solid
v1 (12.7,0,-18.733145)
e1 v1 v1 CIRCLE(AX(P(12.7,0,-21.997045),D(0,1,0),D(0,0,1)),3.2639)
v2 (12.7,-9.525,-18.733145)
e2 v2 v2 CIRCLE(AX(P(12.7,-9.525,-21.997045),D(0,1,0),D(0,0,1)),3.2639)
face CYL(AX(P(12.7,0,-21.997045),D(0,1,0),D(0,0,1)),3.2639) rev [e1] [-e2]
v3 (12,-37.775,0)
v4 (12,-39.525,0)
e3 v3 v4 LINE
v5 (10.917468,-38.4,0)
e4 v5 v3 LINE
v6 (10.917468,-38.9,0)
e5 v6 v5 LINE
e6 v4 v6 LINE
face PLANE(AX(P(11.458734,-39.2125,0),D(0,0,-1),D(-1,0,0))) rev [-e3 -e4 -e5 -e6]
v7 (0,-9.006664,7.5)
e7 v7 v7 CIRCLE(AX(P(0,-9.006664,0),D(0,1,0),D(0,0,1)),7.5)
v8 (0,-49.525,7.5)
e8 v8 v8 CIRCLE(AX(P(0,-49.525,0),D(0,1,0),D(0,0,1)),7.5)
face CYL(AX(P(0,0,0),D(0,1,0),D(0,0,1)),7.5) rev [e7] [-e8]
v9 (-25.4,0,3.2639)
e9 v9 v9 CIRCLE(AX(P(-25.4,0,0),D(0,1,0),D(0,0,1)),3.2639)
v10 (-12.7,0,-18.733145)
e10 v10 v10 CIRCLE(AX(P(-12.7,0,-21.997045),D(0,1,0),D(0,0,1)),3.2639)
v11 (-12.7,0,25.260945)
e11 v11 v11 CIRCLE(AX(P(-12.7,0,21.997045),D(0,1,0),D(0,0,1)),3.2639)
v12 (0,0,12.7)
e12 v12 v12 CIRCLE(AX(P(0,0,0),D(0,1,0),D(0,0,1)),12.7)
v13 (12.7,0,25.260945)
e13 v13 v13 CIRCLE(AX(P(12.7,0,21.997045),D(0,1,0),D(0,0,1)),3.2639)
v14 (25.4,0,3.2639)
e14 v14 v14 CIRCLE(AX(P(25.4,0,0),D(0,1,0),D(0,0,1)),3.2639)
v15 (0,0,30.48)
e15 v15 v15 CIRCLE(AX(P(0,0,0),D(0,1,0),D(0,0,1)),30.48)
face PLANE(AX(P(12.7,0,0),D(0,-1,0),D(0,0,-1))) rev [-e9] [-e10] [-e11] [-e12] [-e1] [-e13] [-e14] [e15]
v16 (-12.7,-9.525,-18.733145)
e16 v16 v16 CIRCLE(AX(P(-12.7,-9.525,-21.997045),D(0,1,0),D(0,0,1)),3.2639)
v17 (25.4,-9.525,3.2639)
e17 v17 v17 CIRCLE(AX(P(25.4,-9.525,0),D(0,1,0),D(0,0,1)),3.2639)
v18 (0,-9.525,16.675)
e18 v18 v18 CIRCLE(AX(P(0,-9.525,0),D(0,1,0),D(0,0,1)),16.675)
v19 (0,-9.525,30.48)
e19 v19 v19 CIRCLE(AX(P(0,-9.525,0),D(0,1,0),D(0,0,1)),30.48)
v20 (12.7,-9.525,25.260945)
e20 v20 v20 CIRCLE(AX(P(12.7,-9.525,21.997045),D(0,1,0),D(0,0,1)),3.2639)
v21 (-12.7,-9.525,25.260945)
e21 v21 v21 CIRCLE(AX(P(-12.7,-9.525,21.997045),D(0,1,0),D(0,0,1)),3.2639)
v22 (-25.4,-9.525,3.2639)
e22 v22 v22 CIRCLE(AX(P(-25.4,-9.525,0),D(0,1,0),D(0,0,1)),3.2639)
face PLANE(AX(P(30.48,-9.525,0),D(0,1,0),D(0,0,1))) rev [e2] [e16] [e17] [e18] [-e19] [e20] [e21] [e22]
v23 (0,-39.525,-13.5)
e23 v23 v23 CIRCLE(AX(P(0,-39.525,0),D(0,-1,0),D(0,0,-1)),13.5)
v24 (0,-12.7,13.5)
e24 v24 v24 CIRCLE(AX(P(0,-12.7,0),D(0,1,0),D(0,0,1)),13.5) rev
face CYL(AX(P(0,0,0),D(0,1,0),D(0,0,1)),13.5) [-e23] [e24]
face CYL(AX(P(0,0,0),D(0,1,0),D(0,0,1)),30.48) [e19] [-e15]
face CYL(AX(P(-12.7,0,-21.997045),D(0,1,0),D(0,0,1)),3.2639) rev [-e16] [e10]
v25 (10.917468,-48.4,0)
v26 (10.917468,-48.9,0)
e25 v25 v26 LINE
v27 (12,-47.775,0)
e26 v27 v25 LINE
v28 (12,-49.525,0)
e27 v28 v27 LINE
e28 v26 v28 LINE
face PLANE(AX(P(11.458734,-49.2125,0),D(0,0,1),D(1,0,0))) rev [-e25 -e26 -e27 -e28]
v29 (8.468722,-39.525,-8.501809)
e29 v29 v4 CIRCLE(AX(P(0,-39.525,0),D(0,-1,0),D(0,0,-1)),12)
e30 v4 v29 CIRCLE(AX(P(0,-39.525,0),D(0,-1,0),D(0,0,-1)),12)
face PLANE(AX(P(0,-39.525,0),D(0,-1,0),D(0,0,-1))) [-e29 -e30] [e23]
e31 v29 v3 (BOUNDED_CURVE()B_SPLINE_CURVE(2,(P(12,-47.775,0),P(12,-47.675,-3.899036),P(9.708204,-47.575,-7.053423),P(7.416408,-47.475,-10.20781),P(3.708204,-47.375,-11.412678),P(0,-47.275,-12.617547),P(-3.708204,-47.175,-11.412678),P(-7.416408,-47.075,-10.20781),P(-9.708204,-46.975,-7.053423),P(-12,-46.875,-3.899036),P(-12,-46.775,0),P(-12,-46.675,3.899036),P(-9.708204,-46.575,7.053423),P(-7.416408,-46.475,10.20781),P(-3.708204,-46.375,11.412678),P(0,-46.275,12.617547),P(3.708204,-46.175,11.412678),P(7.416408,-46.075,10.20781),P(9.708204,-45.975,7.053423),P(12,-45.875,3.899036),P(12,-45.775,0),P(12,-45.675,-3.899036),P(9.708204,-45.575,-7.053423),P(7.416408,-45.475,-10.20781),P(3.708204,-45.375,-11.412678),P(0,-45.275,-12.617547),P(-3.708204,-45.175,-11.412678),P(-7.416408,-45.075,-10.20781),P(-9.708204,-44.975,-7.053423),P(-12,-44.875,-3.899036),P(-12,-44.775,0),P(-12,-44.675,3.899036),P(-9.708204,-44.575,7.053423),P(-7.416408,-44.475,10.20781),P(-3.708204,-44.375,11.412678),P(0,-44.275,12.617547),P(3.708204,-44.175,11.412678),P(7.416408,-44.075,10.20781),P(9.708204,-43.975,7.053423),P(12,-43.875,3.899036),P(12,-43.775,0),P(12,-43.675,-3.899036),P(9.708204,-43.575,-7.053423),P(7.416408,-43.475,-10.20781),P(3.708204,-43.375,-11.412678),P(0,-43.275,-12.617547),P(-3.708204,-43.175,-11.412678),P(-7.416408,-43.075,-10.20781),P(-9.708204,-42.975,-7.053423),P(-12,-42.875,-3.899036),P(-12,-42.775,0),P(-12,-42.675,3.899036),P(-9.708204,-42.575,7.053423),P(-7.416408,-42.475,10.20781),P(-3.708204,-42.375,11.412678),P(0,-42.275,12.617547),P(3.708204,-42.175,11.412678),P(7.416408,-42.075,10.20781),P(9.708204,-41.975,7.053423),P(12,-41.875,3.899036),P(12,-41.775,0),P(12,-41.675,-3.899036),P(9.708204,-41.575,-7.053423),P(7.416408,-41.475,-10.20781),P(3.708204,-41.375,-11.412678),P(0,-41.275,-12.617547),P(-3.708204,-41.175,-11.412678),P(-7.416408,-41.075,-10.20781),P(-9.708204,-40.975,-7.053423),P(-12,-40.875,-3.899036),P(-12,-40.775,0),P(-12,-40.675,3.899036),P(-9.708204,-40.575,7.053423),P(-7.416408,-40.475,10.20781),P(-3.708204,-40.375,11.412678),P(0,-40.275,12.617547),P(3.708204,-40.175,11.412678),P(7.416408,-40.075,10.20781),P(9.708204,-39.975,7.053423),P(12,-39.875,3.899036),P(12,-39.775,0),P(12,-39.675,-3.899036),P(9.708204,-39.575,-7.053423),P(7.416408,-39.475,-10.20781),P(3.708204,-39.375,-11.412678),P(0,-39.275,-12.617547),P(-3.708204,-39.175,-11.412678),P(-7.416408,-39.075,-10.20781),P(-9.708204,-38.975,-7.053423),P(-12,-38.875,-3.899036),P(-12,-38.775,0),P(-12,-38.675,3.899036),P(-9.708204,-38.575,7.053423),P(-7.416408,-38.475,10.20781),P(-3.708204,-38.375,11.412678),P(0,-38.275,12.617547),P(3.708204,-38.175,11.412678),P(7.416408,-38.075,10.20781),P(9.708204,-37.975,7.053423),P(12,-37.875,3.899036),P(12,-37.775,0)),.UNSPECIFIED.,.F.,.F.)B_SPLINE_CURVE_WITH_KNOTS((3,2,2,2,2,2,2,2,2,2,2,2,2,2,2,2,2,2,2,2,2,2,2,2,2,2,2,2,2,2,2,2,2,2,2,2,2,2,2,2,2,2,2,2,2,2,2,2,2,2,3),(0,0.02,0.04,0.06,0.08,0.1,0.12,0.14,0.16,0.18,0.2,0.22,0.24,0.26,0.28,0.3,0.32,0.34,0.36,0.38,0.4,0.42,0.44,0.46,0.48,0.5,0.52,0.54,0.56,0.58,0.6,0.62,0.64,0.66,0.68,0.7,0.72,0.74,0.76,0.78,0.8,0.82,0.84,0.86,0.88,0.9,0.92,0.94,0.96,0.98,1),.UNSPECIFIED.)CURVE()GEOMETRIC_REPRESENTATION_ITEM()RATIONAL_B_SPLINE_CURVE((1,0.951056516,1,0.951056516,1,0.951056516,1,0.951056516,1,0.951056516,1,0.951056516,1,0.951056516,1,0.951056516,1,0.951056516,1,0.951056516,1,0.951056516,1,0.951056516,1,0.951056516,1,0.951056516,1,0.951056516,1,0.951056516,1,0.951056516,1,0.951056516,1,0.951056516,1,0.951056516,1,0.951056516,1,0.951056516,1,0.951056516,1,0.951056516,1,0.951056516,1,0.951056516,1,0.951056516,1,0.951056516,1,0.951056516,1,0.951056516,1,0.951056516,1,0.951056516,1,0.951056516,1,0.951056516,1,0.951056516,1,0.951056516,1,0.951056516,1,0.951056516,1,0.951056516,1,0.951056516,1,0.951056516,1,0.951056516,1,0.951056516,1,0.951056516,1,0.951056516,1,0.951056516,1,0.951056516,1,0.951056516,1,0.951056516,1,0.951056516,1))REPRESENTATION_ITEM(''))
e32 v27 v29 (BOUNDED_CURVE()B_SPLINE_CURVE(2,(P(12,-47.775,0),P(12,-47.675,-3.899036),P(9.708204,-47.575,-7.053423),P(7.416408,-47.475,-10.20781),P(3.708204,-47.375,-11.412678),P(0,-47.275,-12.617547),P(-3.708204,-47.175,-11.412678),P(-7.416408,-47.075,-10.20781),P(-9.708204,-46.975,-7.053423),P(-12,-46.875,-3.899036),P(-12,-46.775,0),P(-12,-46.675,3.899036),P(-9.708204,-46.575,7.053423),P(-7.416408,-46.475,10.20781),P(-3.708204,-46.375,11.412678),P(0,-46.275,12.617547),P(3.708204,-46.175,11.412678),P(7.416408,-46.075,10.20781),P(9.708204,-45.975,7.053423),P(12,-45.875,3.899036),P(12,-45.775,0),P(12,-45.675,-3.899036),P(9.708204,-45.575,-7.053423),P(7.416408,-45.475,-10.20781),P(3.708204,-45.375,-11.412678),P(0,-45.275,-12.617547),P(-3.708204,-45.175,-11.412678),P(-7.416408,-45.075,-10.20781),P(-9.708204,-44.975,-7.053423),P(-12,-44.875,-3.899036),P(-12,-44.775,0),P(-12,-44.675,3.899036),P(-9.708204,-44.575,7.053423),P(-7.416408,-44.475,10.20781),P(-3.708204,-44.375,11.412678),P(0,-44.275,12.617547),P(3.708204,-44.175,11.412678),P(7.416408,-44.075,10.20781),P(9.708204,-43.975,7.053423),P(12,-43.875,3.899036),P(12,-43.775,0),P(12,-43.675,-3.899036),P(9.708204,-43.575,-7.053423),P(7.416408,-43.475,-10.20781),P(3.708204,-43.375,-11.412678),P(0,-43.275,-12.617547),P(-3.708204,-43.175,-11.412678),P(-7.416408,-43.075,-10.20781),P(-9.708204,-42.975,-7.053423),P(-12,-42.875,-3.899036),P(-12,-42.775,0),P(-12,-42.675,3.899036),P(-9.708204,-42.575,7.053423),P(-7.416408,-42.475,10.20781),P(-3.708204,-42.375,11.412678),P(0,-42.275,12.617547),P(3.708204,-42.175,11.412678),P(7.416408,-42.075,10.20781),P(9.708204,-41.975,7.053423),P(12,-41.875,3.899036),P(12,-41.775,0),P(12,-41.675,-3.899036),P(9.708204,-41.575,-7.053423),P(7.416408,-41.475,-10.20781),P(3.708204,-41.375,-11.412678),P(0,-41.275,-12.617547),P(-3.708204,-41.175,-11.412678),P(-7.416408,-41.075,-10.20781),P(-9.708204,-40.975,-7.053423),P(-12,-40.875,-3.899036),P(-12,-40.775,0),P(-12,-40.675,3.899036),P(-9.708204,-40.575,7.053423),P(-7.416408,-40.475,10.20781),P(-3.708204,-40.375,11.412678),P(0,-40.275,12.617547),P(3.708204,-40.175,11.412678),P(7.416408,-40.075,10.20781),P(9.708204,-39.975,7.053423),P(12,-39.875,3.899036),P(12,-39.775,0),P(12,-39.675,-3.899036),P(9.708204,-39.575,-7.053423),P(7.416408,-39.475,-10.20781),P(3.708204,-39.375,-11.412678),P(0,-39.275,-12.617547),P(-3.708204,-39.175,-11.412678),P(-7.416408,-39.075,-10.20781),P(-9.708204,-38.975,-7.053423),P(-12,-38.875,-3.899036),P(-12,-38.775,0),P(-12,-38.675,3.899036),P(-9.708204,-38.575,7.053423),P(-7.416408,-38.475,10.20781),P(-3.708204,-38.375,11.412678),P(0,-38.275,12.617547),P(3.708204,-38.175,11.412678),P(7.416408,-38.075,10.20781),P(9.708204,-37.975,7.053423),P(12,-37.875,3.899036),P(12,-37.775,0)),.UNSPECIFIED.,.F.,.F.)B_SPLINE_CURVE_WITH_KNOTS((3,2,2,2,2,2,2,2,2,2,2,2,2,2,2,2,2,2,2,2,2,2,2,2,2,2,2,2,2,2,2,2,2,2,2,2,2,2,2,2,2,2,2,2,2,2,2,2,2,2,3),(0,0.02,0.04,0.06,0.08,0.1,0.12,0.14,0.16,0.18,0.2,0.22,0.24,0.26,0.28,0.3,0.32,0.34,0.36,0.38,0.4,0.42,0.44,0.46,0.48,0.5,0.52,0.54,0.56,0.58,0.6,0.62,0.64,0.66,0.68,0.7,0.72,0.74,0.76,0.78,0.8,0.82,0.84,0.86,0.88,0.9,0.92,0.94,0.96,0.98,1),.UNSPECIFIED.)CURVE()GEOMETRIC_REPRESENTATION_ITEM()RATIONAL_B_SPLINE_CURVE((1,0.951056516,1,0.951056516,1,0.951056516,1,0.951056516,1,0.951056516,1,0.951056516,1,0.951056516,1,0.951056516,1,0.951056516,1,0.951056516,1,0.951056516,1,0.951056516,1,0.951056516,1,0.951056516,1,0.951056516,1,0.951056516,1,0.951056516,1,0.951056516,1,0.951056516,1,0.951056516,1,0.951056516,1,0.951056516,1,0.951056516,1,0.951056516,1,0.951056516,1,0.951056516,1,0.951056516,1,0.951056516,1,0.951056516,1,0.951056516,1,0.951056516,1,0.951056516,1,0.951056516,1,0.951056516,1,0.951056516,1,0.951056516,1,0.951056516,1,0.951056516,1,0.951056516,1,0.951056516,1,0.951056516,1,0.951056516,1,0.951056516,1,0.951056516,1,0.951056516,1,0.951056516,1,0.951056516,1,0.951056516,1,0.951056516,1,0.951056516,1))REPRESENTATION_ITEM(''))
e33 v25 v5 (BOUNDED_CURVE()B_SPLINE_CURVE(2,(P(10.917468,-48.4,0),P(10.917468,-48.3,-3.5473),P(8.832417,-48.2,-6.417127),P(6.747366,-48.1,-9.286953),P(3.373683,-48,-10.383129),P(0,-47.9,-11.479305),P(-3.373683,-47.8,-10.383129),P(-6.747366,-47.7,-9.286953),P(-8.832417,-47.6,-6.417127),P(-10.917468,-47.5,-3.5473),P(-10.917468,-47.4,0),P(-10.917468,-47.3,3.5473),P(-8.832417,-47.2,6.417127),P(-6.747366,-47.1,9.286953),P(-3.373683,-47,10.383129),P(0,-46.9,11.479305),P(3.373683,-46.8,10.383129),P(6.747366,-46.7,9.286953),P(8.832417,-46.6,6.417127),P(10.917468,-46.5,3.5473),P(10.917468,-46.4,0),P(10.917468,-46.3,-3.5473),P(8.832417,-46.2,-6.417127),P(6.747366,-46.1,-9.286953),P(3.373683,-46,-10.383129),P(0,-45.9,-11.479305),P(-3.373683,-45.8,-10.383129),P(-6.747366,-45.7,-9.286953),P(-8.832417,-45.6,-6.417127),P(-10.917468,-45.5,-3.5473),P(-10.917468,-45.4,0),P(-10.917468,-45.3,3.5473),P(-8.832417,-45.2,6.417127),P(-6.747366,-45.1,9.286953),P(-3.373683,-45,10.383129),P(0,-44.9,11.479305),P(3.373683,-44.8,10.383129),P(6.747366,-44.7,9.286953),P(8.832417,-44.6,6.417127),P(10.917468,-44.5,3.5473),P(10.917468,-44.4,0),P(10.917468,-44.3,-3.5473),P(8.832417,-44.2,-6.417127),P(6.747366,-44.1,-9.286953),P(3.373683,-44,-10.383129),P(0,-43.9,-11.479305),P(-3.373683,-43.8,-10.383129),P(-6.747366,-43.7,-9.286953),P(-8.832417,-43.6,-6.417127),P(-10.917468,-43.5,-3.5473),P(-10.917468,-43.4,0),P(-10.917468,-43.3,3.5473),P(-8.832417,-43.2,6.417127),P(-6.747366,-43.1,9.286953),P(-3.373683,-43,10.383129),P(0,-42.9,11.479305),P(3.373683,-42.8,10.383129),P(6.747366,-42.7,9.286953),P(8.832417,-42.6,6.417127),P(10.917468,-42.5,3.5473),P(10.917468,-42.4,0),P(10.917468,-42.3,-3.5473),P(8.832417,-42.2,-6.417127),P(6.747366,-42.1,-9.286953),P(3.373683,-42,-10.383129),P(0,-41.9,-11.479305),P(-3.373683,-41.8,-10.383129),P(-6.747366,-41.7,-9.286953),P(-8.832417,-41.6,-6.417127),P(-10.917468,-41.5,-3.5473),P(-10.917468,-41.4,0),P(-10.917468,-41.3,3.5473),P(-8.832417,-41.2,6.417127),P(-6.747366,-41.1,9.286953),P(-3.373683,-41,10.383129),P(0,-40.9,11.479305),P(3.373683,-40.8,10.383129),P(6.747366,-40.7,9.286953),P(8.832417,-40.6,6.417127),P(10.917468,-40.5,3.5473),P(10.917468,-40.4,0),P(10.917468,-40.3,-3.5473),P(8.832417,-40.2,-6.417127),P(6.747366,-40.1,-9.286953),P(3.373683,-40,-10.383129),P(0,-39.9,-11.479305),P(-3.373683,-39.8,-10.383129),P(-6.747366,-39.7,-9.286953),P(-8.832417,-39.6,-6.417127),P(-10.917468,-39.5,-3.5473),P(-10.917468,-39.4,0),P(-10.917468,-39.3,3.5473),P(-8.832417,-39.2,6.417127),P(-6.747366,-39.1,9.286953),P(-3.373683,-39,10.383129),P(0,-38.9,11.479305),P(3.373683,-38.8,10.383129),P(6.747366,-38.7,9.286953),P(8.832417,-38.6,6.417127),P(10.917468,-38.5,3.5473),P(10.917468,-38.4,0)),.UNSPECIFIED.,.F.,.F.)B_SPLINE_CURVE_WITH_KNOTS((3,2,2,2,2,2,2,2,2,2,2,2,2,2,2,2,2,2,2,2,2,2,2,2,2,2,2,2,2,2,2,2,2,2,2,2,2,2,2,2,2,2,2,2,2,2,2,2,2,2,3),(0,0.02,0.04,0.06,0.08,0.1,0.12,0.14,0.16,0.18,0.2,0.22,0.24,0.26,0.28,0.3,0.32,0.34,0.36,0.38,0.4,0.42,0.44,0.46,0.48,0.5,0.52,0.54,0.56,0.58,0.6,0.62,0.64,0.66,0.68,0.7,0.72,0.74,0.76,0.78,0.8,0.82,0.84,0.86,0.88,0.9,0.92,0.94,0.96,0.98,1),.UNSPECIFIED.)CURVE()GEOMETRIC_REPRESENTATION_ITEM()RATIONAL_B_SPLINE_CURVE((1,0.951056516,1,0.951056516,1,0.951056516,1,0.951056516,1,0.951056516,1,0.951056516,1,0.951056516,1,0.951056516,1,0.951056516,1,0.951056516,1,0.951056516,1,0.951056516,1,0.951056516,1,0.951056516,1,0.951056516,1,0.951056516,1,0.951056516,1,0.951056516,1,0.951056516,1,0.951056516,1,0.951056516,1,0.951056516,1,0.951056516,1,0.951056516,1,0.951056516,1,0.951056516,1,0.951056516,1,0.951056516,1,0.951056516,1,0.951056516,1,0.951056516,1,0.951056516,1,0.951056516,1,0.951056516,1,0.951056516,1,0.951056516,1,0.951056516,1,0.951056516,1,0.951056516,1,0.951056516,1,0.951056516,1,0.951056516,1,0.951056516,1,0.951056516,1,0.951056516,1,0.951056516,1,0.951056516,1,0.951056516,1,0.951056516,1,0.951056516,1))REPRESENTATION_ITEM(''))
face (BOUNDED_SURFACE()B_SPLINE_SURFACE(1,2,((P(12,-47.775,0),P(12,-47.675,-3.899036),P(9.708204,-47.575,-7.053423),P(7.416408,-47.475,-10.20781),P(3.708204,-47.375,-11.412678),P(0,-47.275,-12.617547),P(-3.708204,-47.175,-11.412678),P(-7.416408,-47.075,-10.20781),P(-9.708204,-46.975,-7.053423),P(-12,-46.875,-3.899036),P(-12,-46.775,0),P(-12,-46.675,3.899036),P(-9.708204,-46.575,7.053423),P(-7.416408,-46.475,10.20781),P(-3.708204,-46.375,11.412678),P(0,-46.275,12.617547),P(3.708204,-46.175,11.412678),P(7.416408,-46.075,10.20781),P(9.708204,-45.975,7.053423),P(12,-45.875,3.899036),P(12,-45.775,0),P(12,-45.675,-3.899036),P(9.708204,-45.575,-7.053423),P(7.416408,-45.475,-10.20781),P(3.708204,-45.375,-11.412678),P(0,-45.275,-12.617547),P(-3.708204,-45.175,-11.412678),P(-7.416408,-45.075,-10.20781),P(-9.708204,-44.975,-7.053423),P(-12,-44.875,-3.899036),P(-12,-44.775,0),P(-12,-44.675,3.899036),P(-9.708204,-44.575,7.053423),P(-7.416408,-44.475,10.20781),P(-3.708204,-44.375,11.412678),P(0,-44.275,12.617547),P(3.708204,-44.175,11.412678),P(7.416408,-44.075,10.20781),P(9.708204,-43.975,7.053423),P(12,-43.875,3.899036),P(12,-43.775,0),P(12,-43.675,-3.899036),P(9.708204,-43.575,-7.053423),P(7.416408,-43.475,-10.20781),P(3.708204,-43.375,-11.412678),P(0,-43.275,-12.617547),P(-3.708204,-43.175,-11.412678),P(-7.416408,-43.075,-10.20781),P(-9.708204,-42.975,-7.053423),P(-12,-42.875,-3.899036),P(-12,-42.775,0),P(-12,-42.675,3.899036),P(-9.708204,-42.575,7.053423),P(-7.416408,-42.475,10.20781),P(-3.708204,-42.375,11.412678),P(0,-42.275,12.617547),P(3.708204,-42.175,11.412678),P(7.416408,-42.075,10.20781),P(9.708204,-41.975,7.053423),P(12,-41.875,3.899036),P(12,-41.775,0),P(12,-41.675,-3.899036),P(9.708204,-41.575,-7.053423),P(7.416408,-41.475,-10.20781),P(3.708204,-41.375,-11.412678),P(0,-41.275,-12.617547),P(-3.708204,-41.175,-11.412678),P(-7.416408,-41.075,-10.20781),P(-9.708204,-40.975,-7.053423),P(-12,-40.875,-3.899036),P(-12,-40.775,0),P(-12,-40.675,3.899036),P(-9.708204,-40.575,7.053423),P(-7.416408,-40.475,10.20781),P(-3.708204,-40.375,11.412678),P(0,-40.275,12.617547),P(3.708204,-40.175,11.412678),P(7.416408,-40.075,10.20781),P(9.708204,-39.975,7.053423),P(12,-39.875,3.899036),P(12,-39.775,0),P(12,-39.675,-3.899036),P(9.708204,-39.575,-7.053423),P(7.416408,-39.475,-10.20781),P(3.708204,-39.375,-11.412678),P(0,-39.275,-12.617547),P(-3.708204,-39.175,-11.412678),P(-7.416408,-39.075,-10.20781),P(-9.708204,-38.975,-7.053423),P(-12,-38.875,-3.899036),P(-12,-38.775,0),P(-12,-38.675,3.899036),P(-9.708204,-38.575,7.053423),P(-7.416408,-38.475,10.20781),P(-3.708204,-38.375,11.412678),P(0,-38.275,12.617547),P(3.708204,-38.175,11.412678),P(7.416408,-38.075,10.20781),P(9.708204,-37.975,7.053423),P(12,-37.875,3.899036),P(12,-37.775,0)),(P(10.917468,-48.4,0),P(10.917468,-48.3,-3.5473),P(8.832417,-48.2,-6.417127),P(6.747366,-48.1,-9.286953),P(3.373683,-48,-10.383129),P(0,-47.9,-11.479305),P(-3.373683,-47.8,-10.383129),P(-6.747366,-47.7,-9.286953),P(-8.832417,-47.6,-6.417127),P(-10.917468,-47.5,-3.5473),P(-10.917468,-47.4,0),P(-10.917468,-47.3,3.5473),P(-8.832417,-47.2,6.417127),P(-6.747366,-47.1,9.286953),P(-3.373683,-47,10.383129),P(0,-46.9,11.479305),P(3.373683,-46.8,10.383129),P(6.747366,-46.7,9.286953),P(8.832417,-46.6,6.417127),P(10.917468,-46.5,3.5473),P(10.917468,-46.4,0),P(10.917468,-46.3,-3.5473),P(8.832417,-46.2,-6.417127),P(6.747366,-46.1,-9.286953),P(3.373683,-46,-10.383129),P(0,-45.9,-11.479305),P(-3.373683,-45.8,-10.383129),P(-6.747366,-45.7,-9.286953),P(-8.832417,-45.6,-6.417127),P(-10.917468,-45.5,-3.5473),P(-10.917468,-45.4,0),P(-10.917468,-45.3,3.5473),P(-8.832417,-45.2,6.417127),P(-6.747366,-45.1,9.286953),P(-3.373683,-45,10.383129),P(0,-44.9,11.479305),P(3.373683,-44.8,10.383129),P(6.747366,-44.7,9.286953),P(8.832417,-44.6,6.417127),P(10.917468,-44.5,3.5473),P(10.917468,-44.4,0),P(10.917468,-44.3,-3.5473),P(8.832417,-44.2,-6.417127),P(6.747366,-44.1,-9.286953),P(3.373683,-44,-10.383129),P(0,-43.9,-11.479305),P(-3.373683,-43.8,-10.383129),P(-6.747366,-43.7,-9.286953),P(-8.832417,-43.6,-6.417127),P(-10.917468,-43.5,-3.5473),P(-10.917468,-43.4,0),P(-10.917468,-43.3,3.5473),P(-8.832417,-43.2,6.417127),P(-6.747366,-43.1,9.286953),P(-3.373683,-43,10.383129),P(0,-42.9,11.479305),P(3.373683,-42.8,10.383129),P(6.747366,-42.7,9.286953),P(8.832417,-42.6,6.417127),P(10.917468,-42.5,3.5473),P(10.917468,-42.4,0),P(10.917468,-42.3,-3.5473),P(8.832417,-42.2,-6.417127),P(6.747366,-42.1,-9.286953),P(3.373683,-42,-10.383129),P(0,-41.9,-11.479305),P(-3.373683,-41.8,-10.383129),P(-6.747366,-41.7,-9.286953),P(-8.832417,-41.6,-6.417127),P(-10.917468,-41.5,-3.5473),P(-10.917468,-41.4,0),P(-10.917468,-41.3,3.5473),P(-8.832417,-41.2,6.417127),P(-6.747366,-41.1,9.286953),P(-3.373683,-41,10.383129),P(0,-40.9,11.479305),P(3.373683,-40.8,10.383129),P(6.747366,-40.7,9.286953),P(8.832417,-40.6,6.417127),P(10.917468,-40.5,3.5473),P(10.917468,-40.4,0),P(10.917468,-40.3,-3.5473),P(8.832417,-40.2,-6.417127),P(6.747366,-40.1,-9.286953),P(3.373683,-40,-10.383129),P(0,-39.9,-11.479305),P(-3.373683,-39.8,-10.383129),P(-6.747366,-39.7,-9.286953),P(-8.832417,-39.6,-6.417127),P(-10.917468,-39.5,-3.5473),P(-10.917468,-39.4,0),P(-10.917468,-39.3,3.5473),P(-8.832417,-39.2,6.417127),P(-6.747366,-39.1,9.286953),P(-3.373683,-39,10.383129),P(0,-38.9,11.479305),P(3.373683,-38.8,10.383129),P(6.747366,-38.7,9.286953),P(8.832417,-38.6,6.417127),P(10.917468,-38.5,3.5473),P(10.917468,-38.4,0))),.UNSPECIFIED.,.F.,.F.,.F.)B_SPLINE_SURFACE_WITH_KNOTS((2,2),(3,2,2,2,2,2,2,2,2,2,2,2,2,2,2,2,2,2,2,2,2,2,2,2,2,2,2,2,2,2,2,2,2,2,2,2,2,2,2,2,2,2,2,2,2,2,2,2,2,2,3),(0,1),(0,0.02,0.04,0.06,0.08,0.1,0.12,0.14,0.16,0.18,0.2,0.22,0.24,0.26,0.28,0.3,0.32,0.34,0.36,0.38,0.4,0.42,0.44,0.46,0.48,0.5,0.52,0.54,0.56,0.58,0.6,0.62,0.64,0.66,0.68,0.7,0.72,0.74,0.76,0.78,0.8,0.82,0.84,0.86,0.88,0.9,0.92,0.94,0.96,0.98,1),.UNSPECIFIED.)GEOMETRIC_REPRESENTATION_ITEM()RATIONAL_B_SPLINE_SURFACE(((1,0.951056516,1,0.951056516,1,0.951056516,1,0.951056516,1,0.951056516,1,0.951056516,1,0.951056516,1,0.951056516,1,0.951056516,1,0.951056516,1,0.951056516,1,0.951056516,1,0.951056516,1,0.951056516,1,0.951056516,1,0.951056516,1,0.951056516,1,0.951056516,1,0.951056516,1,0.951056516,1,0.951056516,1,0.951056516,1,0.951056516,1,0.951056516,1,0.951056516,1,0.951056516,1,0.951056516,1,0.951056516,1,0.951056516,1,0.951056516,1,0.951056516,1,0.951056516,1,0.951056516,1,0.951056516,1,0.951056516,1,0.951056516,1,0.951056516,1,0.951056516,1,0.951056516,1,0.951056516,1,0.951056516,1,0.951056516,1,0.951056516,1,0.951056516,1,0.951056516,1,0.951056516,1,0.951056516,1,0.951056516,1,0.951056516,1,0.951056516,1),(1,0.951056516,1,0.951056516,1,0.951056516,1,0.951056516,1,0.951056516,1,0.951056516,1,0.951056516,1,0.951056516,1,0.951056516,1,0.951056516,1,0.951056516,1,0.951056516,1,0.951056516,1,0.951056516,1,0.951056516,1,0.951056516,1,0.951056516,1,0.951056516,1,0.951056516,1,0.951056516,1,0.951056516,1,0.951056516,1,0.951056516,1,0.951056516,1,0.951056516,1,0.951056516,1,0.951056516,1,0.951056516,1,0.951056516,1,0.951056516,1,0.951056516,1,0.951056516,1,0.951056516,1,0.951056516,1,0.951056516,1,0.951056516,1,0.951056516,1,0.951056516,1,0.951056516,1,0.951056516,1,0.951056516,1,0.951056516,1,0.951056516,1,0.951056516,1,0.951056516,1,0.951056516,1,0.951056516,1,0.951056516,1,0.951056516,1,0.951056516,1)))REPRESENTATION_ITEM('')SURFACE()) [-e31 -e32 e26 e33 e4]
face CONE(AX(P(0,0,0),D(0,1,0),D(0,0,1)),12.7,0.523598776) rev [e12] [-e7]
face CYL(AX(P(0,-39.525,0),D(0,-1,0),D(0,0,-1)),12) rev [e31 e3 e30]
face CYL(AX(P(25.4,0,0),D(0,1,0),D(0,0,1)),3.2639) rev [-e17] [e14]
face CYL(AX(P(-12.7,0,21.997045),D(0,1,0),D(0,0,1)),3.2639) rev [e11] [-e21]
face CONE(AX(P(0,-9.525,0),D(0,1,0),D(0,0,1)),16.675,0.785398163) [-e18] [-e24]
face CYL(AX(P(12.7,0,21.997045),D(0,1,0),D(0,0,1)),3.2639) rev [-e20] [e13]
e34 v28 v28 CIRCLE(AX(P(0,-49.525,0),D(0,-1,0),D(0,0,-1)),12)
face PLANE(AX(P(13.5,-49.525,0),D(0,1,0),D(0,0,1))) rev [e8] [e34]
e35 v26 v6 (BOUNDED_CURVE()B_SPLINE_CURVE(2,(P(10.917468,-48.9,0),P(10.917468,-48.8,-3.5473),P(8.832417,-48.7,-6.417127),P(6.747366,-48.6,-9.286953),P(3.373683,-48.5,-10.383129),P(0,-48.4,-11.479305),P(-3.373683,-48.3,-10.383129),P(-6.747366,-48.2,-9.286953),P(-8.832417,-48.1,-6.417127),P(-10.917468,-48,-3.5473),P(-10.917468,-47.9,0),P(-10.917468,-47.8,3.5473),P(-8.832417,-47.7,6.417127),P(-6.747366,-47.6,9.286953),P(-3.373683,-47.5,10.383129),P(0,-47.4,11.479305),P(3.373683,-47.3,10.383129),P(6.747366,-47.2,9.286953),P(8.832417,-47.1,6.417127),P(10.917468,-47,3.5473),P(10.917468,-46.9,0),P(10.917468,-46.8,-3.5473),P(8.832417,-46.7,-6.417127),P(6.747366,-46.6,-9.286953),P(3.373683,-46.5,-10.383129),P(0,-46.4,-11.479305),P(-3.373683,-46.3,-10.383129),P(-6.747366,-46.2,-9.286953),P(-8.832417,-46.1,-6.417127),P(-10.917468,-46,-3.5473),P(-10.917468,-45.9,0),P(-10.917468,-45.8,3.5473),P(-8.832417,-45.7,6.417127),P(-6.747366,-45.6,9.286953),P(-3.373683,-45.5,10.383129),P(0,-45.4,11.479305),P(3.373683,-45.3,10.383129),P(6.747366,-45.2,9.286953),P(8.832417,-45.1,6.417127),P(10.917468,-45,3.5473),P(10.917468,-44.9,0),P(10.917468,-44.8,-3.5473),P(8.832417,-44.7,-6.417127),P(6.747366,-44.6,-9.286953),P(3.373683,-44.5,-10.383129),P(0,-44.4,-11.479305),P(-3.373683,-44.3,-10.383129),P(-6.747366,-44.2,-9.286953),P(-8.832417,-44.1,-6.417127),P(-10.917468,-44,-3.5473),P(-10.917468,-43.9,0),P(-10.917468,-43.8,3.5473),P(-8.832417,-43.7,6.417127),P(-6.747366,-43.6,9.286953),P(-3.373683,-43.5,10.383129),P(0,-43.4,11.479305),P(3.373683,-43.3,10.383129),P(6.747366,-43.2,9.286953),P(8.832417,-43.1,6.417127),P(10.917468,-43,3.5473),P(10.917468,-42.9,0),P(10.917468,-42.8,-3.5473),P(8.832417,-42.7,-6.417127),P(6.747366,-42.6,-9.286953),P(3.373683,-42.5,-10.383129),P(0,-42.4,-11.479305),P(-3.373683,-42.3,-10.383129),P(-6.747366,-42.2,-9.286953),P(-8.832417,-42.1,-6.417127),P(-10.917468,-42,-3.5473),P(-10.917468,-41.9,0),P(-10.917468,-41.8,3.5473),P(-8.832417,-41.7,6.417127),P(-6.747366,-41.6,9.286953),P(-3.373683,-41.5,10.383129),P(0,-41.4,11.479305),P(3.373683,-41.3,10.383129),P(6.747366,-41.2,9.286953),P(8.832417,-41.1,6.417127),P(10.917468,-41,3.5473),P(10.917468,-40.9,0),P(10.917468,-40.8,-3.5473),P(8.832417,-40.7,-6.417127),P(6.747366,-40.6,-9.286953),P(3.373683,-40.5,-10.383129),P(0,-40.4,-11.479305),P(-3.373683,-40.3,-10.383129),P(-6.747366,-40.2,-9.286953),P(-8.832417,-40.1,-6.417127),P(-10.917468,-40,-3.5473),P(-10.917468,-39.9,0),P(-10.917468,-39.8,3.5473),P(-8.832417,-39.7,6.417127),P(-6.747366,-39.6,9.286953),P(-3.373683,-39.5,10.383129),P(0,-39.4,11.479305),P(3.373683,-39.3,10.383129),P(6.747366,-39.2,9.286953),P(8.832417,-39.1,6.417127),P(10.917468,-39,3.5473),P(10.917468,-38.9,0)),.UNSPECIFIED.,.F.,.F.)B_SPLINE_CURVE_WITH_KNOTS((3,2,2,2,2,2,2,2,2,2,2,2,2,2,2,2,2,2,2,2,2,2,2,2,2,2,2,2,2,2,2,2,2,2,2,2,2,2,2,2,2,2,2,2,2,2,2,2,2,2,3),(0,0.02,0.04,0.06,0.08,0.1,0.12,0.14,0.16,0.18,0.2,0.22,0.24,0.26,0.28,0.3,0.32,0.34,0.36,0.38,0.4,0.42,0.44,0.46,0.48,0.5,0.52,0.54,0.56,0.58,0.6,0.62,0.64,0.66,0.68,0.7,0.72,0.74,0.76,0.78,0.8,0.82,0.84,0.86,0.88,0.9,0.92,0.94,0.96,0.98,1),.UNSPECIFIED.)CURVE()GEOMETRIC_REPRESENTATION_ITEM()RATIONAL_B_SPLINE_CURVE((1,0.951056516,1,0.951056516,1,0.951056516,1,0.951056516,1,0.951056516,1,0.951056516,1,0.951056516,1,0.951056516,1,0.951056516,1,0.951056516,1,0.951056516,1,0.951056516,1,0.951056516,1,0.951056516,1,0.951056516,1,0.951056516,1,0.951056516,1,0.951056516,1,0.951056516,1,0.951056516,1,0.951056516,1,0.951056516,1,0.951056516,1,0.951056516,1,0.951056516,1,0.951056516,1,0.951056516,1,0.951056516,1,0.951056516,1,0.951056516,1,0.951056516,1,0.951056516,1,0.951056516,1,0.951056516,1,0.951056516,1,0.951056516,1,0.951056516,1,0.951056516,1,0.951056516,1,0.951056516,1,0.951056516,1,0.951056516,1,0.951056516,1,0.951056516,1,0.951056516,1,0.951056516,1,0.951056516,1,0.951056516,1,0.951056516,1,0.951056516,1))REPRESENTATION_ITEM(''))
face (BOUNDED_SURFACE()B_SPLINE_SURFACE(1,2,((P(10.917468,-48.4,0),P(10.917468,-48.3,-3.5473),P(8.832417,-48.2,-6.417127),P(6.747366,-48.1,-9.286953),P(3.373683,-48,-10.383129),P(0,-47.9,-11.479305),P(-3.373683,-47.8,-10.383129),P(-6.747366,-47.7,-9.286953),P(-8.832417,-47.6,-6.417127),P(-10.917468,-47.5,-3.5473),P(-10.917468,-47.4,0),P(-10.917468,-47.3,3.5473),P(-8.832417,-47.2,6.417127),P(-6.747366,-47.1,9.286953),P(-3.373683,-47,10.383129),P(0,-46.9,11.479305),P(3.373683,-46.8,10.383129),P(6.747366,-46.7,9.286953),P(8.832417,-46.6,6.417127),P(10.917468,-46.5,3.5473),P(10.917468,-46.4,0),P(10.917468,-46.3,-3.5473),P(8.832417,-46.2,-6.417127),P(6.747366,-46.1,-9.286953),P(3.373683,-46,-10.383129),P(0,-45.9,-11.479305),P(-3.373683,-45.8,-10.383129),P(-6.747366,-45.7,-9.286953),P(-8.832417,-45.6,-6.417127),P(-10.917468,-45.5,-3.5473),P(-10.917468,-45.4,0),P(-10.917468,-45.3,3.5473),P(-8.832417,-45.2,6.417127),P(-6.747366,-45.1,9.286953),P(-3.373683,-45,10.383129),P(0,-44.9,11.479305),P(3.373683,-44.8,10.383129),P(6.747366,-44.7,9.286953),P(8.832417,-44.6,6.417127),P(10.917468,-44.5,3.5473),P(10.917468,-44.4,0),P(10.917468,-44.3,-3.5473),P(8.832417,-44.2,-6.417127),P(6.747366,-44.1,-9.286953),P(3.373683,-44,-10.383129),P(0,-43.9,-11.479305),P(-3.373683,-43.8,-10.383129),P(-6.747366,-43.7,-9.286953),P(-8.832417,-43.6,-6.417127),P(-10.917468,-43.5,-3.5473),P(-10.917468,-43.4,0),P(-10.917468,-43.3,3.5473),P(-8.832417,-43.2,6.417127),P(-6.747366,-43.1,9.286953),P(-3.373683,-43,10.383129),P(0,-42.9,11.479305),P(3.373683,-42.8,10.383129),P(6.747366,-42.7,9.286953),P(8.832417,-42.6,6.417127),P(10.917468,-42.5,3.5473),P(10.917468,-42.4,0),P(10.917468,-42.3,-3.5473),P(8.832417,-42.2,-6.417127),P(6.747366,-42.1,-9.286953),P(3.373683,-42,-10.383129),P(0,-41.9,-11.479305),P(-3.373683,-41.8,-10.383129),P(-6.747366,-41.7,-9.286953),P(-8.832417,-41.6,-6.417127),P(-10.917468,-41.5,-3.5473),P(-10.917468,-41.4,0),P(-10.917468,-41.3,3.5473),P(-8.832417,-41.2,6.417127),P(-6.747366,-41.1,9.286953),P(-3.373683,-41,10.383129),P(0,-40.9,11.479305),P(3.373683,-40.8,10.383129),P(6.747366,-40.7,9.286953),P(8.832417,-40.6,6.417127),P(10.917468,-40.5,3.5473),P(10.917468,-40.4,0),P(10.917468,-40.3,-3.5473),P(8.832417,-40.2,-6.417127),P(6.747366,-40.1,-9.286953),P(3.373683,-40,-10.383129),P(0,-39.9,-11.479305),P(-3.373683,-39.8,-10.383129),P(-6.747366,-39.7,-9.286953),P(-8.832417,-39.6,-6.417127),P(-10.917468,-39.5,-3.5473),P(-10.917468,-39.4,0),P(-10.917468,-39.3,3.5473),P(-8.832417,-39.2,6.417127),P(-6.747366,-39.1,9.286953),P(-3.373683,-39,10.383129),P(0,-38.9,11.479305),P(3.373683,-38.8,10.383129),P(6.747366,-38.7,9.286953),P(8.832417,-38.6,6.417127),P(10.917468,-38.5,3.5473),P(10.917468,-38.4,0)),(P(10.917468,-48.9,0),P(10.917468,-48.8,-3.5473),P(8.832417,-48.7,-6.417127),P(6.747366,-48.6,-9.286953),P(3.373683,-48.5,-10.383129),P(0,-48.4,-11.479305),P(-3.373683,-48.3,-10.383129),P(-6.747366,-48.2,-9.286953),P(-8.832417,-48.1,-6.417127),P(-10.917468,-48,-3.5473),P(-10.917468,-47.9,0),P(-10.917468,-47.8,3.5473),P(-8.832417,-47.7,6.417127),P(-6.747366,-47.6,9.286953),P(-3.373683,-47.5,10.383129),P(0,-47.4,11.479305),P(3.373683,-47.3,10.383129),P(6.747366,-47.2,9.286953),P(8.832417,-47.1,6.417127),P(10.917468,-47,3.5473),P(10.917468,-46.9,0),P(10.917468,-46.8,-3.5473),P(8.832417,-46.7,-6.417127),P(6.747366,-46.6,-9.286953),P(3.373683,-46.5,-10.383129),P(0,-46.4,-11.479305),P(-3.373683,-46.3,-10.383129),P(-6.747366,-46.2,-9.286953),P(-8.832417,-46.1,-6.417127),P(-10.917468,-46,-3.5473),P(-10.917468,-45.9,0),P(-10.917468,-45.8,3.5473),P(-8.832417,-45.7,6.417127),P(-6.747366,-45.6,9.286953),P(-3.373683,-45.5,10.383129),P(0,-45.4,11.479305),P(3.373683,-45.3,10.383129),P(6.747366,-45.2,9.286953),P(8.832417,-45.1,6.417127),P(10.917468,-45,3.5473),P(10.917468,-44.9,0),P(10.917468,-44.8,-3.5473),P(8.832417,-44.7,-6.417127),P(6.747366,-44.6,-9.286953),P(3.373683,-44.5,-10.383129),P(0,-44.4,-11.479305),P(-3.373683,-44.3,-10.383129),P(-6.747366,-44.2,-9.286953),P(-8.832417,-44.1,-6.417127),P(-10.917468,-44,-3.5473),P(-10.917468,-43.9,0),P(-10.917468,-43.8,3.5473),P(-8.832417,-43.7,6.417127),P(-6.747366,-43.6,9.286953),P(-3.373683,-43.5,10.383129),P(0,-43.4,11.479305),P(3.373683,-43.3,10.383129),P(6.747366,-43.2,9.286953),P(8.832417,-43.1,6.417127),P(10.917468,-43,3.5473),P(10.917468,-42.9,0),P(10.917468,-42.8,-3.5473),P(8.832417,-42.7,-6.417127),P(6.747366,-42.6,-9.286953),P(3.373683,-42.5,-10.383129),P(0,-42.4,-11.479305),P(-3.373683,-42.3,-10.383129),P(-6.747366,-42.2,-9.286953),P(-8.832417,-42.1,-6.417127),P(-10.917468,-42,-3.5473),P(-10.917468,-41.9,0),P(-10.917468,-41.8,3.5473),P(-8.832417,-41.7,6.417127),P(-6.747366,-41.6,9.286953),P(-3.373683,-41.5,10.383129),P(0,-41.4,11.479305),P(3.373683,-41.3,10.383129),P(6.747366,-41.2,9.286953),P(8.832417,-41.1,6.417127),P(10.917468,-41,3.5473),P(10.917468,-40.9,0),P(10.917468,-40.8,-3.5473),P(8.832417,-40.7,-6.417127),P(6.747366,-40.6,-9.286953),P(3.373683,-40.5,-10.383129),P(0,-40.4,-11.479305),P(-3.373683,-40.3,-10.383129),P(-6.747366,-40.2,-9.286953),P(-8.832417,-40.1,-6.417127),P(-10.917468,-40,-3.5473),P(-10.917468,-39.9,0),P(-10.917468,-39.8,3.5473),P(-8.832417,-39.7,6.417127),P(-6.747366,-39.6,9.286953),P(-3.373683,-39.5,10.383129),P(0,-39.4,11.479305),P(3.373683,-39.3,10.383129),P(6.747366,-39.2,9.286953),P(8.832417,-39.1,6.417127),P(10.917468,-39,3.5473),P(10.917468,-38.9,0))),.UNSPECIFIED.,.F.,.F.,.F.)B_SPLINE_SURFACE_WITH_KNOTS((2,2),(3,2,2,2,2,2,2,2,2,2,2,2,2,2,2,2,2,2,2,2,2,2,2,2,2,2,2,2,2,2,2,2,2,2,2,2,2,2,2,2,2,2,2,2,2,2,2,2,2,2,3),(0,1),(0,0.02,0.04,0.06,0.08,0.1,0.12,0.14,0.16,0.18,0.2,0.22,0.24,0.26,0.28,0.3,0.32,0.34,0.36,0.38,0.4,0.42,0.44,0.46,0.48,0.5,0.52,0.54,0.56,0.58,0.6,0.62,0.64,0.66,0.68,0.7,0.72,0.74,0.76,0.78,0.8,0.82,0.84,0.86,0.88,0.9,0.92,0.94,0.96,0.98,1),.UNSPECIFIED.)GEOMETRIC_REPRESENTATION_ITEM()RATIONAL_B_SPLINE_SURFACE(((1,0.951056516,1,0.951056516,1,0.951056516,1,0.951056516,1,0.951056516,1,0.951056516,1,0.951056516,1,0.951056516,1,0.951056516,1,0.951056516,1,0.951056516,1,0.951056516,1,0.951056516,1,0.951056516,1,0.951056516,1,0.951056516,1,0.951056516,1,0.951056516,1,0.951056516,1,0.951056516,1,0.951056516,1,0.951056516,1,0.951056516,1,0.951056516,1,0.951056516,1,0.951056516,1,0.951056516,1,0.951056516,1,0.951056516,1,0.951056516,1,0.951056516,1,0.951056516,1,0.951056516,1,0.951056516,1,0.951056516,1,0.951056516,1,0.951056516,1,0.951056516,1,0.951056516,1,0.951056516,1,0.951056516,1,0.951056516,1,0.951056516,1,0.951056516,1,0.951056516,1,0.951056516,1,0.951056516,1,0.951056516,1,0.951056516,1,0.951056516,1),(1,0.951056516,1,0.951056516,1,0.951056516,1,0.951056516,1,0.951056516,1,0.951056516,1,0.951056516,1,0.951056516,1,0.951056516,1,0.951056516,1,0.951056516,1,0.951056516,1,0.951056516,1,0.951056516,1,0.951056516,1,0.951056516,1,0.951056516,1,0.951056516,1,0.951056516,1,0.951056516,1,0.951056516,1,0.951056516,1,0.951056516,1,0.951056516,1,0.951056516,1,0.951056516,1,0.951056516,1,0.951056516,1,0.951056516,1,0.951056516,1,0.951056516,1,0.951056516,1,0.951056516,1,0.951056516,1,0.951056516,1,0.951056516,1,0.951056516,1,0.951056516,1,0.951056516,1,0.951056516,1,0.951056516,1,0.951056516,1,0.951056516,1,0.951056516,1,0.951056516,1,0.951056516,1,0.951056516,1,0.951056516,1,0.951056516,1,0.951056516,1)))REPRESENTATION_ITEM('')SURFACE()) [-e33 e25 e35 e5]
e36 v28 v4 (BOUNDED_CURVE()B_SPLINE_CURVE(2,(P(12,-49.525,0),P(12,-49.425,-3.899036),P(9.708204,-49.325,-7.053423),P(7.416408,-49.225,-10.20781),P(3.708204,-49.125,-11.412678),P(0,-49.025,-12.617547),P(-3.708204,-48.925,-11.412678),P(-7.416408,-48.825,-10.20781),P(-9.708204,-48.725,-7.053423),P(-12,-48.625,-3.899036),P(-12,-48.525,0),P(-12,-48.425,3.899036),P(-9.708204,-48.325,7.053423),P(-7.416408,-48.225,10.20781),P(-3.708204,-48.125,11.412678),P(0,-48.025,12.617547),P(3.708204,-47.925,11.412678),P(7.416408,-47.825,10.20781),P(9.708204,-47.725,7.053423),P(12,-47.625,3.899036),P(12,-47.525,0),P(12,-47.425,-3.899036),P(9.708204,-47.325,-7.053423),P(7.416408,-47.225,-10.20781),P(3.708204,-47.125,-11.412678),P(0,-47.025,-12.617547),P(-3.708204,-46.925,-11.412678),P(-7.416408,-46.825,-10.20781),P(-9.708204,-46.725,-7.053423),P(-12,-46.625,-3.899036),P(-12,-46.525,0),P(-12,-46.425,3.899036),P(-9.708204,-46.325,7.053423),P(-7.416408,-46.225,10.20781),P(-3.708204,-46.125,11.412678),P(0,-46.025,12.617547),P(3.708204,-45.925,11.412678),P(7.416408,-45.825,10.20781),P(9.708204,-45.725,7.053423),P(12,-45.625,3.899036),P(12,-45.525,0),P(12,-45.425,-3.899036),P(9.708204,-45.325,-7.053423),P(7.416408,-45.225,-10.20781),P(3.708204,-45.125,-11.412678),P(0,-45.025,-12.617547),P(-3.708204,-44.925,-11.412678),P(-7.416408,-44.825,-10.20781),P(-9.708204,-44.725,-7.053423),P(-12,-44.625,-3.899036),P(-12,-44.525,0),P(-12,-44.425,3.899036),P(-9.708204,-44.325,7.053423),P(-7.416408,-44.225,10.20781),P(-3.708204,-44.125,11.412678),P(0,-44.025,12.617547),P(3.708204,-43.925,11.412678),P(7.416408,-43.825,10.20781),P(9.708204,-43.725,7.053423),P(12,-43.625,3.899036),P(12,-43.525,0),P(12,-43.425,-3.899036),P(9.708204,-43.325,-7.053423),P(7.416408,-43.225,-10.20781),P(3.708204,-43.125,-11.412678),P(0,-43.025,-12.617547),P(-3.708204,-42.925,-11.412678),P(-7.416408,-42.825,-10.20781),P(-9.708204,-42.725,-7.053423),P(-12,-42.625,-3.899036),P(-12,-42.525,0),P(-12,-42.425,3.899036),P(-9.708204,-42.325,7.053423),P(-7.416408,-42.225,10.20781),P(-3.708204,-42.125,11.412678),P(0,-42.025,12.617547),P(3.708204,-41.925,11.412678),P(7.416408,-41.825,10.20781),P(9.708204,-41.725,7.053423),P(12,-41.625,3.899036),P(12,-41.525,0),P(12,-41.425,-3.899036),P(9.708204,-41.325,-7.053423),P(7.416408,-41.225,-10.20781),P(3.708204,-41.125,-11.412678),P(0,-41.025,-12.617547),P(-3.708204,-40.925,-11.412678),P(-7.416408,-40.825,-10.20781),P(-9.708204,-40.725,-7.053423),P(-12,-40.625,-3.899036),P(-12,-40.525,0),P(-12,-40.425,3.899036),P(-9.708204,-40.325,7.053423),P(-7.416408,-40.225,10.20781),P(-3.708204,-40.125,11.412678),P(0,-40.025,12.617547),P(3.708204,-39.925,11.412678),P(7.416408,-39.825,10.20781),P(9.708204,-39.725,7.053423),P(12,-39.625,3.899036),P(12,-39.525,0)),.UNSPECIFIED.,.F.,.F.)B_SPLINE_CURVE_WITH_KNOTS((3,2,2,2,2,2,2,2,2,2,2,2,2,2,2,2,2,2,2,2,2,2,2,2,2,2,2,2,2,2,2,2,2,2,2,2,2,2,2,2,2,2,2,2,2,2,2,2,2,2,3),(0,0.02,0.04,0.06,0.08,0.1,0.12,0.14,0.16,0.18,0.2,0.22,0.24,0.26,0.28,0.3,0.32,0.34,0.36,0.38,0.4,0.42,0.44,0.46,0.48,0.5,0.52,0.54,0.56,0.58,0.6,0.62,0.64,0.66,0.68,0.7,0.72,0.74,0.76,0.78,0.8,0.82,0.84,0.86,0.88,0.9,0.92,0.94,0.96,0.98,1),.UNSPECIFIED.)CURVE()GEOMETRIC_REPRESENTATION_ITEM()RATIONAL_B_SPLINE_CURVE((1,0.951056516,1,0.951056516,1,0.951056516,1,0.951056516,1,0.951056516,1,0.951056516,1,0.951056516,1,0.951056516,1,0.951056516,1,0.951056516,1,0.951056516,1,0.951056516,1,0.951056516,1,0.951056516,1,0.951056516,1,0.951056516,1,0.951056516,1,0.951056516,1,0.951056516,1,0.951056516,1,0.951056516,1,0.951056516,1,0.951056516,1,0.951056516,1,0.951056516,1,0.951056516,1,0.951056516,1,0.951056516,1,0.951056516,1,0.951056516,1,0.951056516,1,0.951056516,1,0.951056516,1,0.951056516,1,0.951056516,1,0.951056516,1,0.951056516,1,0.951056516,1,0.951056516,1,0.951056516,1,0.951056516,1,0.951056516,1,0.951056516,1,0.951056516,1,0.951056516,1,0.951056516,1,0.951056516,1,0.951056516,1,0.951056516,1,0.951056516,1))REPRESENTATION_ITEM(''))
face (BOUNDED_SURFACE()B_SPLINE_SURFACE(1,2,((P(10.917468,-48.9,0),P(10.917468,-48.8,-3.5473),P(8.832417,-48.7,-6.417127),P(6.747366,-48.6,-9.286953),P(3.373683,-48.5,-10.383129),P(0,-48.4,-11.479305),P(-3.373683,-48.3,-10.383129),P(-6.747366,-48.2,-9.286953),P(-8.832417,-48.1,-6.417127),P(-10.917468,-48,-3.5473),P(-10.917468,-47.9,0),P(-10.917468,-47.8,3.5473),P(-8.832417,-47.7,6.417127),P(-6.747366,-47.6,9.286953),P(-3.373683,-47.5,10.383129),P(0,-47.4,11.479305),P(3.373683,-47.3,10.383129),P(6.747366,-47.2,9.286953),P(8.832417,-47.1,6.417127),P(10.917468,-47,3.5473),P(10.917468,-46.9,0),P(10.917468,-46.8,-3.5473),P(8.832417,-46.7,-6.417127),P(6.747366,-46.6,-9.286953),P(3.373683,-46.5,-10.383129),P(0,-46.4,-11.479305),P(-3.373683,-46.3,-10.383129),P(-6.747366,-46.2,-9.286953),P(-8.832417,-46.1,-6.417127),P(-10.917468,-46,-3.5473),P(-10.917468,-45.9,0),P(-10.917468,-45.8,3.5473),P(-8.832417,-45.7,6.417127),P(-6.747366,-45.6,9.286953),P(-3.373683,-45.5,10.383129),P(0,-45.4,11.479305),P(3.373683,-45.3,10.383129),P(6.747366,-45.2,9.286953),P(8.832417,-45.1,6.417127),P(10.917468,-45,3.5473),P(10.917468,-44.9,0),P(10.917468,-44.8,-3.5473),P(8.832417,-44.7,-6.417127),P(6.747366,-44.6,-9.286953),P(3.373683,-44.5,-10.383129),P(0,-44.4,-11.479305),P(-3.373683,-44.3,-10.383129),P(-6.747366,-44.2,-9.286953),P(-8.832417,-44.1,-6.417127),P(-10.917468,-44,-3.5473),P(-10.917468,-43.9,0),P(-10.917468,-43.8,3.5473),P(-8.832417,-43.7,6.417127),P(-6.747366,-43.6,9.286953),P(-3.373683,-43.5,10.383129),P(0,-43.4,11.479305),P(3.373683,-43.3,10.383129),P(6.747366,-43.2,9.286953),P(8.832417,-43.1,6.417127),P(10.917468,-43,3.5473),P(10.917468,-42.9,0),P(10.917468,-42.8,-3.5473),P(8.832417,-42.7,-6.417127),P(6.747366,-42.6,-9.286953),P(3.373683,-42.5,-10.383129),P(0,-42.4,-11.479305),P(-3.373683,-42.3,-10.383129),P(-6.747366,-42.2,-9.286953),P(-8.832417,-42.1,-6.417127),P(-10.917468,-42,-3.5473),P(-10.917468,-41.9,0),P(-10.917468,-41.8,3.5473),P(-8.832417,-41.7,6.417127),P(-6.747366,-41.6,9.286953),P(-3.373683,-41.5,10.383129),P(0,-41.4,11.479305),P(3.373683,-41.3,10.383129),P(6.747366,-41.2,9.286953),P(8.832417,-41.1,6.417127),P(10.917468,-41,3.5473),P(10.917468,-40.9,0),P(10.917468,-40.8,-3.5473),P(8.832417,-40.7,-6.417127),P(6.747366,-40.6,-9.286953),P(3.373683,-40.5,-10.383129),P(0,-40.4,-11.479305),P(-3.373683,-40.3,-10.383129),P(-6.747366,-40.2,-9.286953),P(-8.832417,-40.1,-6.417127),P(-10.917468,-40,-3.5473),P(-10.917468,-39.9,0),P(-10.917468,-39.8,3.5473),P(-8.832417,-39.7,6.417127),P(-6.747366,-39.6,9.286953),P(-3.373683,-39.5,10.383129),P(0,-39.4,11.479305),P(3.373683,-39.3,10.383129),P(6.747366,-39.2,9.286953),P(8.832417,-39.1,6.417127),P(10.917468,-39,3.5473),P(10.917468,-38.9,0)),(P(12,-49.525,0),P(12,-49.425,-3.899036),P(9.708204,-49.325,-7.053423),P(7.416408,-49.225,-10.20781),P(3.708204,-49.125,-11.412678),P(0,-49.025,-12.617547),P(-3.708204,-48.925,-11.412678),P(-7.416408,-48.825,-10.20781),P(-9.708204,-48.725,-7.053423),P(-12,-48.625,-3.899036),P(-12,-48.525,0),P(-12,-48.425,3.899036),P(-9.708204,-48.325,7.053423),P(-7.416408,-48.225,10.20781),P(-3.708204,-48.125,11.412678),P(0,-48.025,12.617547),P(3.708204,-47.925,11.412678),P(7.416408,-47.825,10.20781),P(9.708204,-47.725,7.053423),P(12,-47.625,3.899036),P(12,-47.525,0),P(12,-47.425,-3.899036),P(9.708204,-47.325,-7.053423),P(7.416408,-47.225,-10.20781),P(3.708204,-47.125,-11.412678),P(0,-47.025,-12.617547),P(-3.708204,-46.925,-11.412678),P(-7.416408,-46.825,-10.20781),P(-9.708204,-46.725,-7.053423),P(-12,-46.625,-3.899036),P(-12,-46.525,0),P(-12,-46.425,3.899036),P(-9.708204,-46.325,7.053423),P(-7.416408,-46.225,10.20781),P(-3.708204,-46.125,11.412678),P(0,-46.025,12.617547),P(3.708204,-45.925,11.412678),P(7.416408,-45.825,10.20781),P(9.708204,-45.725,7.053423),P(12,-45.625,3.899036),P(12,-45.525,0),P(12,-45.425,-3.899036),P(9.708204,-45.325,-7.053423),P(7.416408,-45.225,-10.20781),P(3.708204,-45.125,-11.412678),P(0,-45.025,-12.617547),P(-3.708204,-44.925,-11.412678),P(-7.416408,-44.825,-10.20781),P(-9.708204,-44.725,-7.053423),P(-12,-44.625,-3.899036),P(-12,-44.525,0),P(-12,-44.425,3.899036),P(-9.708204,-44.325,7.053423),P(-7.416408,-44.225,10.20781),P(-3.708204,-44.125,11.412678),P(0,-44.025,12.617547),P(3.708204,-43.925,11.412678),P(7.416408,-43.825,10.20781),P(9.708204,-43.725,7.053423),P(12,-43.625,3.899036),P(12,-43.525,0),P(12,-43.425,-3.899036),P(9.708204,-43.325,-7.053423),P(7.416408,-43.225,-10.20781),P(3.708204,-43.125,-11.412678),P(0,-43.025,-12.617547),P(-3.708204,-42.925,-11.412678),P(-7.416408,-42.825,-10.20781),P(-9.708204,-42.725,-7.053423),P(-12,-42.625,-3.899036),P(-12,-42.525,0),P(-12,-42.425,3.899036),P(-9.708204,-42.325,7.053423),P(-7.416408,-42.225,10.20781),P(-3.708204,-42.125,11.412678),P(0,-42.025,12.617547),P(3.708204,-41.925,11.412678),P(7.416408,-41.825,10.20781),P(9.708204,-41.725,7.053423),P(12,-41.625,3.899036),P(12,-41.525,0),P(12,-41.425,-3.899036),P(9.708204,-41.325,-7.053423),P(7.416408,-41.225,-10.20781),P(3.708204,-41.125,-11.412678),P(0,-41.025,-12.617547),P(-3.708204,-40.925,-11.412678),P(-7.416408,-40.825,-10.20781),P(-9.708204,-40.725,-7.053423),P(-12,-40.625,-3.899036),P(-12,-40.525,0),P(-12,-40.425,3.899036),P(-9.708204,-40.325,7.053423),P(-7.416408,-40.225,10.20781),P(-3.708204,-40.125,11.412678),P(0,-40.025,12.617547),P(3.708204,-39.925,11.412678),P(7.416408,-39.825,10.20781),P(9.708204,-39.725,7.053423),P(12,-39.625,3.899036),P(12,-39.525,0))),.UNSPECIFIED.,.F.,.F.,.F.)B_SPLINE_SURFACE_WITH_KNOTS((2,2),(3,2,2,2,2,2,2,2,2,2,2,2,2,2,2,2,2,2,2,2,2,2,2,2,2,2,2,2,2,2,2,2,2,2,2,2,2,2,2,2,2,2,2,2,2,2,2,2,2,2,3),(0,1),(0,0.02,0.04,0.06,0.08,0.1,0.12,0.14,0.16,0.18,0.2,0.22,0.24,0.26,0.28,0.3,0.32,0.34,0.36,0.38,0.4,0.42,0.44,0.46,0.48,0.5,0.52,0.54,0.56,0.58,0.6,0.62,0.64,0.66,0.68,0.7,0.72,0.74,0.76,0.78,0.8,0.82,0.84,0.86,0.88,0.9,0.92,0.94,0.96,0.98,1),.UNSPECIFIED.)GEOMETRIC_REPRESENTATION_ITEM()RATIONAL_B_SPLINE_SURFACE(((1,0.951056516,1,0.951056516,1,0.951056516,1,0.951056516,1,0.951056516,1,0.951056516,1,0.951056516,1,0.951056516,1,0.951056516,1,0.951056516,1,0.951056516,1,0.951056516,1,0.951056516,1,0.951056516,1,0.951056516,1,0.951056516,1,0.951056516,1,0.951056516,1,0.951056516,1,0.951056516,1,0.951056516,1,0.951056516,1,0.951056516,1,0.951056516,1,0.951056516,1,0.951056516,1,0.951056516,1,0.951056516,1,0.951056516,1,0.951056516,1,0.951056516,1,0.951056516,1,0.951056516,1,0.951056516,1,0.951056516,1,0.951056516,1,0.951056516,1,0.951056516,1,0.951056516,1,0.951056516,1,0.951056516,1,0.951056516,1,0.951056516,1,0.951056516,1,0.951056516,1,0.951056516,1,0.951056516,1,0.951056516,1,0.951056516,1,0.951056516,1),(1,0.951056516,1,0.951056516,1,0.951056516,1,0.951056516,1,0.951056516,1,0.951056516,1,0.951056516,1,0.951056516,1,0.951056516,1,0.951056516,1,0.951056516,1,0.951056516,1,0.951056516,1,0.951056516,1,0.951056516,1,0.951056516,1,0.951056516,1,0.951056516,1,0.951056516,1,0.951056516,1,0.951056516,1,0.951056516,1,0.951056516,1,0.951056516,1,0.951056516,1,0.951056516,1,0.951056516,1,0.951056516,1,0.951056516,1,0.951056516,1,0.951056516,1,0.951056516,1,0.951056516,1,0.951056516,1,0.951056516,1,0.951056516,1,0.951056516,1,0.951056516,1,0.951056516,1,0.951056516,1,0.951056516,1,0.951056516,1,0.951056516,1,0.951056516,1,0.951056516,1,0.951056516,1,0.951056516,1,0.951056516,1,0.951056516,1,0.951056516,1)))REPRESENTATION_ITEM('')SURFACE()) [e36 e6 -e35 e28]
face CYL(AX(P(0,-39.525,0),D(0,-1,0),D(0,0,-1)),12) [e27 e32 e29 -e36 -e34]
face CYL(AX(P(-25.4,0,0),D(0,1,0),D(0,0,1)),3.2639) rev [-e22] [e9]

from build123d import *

# Parameters (mm, degrees)
F_1_4_CLEARANCE_HOLE1_D = 6.5278
CIRPATTERN1_COUNT       = 6
CHAMFER2_SIZE           = 3.175
SKETCH6_R               = 14.166458521
SKETCH6_R_2             = 12
CUT_EXTRUDE1_DEPTH      = 10
THREAD1_PITCH           = 2


with BuildPart() as part:
    # Sketch1 → Revolve1 (revolve)
    with BuildSketch(Plane.XY, mode=Mode.PRIVATE) as revolve1_sk:
        Polygon((7.5, -49.525), (7.5, -9.006664199), (12.7, 0), (30.48, 0), (30.48, -9.525), (13.5, -9.525), (13.5, -49.525), align=None)
    revolve(revolve1_sk.sketch.rotate(Axis((0, 0, 0), (0, -1, 0)), 90), axis=Axis((0, 0, 0), (0, -1, 0)))

    # 1/4 Clearance Hole1 (through all)
    with Locations(Plane(origin=(0, 0, 0), x_dir=(1, 0, 0), z_dir=(0, 1, 0))):
        with Locations((25.4, 0)):
            f_1_4_clearance_hole1 = Hole(F_1_4_CLEARANCE_HOLE1_D / 2)

    # CirPattern1: 1/4 Clearance Hole1 ×6 about axis
    cirpattern1_axis = Axis((0, 0, 0), (0, 1, 0))
    for i in range(1, CIRPATTERN1_COUNT):
        add(f_1_4_clearance_hole1.rotate(cirpattern1_axis, i * 360 / CIRPATTERN1_COUNT), mode=Mode.SUBTRACT)

    # Chamfer2
    chamfer2_edges = [part.edges().sort_by_distance(p)[0] for p in [
        (0, -9.525, -13.5),
    ]]
    chamfer(chamfer2_edges, length=CHAMFER2_SIZE)

    # Sketch6 → Cut-Extrude1 (cut)
    with BuildSketch(Plane(origin=(0, -49.525, 0), x_dir=(-1, 0, 0), z_dir=(0, -1, 0))):
        Circle(SKETCH6_R)
        with Locations(Location((0, 0, 0), (0, 0, 90))):
            Circle(SKETCH6_R_2, mode=Mode.SUBTRACT)
    extrude(amount=-CUT_EXTRUDE1_DEPTH, mode=Mode.SUBTRACT)

    # Thread1: the profile of Thread Profile2 profile screwed along a right-hand helix of 5 turns, 10 arcs to a turn; built about Z, then put on its axis
    thread1_z = Axis((0, 0, 0), (0, 0, 1))
    thread1_corners = [(12.0003, 0, -0.000173205), (12.0003, 0, 1.7501732), (10.91746825, 0, 1.124999997), (10.91746825, 0, 0.624999997)]
    with BuildLine(mode=Mode.PRIVATE) as thread1_profile:
        Line(thread1_corners[0], thread1_corners[1])
        Line(thread1_corners[1], thread1_corners[2])
        Line(thread1_corners[2], thread1_corners[3])
        Line(thread1_corners[3], thread1_corners[0])
    thread1_cap = Face(thread1_profile.wire())
    thread1_turn_angles = [0, 18, 36, 54, 72, 90, 108, 126, 144, 162, 180, 198, 216, 234, 252, 270, 288, 306, 324, 342, 360]
    thread1_turn_weights = [1, 0.9510565162951535, 1, 0.9510565162951535, 1, 0.9510565162951535, 1, 0.9510565162951535, 1, 0.9510565162951535, 1, 0.9510565162951535, 1, 0.9510565162951535, 1, 0.9510565162951535, 1, 0.9510565162951535, 1, 0.9510565162951535, 1]
    thread1_turn_rails = [Edge.make_bspline([Vector(p[0], p[1], 0).rotate(thread1_z, thread1_turn_angles[k]) / thread1_turn_weights[k] + Vector(0, 0, p[2] + THREAD1_PITCH * thread1_turn_angles[k] / 360) for k in range(21)], [0, 0, 0, 1, 1, 2, 2, 3, 3, 4, 4, 5, 5, 6, 6, 7, 7, 8, 8, 9, 9, 10, 10, 10], 2, thread1_turn_weights) for p in thread1_corners]
    thread1_turn_sides = [Face.make_surface_from_curves(thread1_turn_rails[p[0]], thread1_turn_rails[p[1]]) for p in [(0, 1), (1, 2), (2, 3), (3, 0)]]
    thread1 = Plane(origin=(0, -49.525, 0), x_dir=(1, 0, 0), z_dir=(0, 1, 0)) * Solid(Shell([*[p.moved(Location((0, 0, THREAD1_PITCH * i))) for i in range(5) for p in thread1_turn_sides], thread1_cap, thread1_cap.rotate(thread1_z, 1800).moved(Location((0, 0, THREAD1_PITCH * 1800 / 360)))]))
    add(thread1, mode=Mode.SUBTRACT)


solid = part.part
